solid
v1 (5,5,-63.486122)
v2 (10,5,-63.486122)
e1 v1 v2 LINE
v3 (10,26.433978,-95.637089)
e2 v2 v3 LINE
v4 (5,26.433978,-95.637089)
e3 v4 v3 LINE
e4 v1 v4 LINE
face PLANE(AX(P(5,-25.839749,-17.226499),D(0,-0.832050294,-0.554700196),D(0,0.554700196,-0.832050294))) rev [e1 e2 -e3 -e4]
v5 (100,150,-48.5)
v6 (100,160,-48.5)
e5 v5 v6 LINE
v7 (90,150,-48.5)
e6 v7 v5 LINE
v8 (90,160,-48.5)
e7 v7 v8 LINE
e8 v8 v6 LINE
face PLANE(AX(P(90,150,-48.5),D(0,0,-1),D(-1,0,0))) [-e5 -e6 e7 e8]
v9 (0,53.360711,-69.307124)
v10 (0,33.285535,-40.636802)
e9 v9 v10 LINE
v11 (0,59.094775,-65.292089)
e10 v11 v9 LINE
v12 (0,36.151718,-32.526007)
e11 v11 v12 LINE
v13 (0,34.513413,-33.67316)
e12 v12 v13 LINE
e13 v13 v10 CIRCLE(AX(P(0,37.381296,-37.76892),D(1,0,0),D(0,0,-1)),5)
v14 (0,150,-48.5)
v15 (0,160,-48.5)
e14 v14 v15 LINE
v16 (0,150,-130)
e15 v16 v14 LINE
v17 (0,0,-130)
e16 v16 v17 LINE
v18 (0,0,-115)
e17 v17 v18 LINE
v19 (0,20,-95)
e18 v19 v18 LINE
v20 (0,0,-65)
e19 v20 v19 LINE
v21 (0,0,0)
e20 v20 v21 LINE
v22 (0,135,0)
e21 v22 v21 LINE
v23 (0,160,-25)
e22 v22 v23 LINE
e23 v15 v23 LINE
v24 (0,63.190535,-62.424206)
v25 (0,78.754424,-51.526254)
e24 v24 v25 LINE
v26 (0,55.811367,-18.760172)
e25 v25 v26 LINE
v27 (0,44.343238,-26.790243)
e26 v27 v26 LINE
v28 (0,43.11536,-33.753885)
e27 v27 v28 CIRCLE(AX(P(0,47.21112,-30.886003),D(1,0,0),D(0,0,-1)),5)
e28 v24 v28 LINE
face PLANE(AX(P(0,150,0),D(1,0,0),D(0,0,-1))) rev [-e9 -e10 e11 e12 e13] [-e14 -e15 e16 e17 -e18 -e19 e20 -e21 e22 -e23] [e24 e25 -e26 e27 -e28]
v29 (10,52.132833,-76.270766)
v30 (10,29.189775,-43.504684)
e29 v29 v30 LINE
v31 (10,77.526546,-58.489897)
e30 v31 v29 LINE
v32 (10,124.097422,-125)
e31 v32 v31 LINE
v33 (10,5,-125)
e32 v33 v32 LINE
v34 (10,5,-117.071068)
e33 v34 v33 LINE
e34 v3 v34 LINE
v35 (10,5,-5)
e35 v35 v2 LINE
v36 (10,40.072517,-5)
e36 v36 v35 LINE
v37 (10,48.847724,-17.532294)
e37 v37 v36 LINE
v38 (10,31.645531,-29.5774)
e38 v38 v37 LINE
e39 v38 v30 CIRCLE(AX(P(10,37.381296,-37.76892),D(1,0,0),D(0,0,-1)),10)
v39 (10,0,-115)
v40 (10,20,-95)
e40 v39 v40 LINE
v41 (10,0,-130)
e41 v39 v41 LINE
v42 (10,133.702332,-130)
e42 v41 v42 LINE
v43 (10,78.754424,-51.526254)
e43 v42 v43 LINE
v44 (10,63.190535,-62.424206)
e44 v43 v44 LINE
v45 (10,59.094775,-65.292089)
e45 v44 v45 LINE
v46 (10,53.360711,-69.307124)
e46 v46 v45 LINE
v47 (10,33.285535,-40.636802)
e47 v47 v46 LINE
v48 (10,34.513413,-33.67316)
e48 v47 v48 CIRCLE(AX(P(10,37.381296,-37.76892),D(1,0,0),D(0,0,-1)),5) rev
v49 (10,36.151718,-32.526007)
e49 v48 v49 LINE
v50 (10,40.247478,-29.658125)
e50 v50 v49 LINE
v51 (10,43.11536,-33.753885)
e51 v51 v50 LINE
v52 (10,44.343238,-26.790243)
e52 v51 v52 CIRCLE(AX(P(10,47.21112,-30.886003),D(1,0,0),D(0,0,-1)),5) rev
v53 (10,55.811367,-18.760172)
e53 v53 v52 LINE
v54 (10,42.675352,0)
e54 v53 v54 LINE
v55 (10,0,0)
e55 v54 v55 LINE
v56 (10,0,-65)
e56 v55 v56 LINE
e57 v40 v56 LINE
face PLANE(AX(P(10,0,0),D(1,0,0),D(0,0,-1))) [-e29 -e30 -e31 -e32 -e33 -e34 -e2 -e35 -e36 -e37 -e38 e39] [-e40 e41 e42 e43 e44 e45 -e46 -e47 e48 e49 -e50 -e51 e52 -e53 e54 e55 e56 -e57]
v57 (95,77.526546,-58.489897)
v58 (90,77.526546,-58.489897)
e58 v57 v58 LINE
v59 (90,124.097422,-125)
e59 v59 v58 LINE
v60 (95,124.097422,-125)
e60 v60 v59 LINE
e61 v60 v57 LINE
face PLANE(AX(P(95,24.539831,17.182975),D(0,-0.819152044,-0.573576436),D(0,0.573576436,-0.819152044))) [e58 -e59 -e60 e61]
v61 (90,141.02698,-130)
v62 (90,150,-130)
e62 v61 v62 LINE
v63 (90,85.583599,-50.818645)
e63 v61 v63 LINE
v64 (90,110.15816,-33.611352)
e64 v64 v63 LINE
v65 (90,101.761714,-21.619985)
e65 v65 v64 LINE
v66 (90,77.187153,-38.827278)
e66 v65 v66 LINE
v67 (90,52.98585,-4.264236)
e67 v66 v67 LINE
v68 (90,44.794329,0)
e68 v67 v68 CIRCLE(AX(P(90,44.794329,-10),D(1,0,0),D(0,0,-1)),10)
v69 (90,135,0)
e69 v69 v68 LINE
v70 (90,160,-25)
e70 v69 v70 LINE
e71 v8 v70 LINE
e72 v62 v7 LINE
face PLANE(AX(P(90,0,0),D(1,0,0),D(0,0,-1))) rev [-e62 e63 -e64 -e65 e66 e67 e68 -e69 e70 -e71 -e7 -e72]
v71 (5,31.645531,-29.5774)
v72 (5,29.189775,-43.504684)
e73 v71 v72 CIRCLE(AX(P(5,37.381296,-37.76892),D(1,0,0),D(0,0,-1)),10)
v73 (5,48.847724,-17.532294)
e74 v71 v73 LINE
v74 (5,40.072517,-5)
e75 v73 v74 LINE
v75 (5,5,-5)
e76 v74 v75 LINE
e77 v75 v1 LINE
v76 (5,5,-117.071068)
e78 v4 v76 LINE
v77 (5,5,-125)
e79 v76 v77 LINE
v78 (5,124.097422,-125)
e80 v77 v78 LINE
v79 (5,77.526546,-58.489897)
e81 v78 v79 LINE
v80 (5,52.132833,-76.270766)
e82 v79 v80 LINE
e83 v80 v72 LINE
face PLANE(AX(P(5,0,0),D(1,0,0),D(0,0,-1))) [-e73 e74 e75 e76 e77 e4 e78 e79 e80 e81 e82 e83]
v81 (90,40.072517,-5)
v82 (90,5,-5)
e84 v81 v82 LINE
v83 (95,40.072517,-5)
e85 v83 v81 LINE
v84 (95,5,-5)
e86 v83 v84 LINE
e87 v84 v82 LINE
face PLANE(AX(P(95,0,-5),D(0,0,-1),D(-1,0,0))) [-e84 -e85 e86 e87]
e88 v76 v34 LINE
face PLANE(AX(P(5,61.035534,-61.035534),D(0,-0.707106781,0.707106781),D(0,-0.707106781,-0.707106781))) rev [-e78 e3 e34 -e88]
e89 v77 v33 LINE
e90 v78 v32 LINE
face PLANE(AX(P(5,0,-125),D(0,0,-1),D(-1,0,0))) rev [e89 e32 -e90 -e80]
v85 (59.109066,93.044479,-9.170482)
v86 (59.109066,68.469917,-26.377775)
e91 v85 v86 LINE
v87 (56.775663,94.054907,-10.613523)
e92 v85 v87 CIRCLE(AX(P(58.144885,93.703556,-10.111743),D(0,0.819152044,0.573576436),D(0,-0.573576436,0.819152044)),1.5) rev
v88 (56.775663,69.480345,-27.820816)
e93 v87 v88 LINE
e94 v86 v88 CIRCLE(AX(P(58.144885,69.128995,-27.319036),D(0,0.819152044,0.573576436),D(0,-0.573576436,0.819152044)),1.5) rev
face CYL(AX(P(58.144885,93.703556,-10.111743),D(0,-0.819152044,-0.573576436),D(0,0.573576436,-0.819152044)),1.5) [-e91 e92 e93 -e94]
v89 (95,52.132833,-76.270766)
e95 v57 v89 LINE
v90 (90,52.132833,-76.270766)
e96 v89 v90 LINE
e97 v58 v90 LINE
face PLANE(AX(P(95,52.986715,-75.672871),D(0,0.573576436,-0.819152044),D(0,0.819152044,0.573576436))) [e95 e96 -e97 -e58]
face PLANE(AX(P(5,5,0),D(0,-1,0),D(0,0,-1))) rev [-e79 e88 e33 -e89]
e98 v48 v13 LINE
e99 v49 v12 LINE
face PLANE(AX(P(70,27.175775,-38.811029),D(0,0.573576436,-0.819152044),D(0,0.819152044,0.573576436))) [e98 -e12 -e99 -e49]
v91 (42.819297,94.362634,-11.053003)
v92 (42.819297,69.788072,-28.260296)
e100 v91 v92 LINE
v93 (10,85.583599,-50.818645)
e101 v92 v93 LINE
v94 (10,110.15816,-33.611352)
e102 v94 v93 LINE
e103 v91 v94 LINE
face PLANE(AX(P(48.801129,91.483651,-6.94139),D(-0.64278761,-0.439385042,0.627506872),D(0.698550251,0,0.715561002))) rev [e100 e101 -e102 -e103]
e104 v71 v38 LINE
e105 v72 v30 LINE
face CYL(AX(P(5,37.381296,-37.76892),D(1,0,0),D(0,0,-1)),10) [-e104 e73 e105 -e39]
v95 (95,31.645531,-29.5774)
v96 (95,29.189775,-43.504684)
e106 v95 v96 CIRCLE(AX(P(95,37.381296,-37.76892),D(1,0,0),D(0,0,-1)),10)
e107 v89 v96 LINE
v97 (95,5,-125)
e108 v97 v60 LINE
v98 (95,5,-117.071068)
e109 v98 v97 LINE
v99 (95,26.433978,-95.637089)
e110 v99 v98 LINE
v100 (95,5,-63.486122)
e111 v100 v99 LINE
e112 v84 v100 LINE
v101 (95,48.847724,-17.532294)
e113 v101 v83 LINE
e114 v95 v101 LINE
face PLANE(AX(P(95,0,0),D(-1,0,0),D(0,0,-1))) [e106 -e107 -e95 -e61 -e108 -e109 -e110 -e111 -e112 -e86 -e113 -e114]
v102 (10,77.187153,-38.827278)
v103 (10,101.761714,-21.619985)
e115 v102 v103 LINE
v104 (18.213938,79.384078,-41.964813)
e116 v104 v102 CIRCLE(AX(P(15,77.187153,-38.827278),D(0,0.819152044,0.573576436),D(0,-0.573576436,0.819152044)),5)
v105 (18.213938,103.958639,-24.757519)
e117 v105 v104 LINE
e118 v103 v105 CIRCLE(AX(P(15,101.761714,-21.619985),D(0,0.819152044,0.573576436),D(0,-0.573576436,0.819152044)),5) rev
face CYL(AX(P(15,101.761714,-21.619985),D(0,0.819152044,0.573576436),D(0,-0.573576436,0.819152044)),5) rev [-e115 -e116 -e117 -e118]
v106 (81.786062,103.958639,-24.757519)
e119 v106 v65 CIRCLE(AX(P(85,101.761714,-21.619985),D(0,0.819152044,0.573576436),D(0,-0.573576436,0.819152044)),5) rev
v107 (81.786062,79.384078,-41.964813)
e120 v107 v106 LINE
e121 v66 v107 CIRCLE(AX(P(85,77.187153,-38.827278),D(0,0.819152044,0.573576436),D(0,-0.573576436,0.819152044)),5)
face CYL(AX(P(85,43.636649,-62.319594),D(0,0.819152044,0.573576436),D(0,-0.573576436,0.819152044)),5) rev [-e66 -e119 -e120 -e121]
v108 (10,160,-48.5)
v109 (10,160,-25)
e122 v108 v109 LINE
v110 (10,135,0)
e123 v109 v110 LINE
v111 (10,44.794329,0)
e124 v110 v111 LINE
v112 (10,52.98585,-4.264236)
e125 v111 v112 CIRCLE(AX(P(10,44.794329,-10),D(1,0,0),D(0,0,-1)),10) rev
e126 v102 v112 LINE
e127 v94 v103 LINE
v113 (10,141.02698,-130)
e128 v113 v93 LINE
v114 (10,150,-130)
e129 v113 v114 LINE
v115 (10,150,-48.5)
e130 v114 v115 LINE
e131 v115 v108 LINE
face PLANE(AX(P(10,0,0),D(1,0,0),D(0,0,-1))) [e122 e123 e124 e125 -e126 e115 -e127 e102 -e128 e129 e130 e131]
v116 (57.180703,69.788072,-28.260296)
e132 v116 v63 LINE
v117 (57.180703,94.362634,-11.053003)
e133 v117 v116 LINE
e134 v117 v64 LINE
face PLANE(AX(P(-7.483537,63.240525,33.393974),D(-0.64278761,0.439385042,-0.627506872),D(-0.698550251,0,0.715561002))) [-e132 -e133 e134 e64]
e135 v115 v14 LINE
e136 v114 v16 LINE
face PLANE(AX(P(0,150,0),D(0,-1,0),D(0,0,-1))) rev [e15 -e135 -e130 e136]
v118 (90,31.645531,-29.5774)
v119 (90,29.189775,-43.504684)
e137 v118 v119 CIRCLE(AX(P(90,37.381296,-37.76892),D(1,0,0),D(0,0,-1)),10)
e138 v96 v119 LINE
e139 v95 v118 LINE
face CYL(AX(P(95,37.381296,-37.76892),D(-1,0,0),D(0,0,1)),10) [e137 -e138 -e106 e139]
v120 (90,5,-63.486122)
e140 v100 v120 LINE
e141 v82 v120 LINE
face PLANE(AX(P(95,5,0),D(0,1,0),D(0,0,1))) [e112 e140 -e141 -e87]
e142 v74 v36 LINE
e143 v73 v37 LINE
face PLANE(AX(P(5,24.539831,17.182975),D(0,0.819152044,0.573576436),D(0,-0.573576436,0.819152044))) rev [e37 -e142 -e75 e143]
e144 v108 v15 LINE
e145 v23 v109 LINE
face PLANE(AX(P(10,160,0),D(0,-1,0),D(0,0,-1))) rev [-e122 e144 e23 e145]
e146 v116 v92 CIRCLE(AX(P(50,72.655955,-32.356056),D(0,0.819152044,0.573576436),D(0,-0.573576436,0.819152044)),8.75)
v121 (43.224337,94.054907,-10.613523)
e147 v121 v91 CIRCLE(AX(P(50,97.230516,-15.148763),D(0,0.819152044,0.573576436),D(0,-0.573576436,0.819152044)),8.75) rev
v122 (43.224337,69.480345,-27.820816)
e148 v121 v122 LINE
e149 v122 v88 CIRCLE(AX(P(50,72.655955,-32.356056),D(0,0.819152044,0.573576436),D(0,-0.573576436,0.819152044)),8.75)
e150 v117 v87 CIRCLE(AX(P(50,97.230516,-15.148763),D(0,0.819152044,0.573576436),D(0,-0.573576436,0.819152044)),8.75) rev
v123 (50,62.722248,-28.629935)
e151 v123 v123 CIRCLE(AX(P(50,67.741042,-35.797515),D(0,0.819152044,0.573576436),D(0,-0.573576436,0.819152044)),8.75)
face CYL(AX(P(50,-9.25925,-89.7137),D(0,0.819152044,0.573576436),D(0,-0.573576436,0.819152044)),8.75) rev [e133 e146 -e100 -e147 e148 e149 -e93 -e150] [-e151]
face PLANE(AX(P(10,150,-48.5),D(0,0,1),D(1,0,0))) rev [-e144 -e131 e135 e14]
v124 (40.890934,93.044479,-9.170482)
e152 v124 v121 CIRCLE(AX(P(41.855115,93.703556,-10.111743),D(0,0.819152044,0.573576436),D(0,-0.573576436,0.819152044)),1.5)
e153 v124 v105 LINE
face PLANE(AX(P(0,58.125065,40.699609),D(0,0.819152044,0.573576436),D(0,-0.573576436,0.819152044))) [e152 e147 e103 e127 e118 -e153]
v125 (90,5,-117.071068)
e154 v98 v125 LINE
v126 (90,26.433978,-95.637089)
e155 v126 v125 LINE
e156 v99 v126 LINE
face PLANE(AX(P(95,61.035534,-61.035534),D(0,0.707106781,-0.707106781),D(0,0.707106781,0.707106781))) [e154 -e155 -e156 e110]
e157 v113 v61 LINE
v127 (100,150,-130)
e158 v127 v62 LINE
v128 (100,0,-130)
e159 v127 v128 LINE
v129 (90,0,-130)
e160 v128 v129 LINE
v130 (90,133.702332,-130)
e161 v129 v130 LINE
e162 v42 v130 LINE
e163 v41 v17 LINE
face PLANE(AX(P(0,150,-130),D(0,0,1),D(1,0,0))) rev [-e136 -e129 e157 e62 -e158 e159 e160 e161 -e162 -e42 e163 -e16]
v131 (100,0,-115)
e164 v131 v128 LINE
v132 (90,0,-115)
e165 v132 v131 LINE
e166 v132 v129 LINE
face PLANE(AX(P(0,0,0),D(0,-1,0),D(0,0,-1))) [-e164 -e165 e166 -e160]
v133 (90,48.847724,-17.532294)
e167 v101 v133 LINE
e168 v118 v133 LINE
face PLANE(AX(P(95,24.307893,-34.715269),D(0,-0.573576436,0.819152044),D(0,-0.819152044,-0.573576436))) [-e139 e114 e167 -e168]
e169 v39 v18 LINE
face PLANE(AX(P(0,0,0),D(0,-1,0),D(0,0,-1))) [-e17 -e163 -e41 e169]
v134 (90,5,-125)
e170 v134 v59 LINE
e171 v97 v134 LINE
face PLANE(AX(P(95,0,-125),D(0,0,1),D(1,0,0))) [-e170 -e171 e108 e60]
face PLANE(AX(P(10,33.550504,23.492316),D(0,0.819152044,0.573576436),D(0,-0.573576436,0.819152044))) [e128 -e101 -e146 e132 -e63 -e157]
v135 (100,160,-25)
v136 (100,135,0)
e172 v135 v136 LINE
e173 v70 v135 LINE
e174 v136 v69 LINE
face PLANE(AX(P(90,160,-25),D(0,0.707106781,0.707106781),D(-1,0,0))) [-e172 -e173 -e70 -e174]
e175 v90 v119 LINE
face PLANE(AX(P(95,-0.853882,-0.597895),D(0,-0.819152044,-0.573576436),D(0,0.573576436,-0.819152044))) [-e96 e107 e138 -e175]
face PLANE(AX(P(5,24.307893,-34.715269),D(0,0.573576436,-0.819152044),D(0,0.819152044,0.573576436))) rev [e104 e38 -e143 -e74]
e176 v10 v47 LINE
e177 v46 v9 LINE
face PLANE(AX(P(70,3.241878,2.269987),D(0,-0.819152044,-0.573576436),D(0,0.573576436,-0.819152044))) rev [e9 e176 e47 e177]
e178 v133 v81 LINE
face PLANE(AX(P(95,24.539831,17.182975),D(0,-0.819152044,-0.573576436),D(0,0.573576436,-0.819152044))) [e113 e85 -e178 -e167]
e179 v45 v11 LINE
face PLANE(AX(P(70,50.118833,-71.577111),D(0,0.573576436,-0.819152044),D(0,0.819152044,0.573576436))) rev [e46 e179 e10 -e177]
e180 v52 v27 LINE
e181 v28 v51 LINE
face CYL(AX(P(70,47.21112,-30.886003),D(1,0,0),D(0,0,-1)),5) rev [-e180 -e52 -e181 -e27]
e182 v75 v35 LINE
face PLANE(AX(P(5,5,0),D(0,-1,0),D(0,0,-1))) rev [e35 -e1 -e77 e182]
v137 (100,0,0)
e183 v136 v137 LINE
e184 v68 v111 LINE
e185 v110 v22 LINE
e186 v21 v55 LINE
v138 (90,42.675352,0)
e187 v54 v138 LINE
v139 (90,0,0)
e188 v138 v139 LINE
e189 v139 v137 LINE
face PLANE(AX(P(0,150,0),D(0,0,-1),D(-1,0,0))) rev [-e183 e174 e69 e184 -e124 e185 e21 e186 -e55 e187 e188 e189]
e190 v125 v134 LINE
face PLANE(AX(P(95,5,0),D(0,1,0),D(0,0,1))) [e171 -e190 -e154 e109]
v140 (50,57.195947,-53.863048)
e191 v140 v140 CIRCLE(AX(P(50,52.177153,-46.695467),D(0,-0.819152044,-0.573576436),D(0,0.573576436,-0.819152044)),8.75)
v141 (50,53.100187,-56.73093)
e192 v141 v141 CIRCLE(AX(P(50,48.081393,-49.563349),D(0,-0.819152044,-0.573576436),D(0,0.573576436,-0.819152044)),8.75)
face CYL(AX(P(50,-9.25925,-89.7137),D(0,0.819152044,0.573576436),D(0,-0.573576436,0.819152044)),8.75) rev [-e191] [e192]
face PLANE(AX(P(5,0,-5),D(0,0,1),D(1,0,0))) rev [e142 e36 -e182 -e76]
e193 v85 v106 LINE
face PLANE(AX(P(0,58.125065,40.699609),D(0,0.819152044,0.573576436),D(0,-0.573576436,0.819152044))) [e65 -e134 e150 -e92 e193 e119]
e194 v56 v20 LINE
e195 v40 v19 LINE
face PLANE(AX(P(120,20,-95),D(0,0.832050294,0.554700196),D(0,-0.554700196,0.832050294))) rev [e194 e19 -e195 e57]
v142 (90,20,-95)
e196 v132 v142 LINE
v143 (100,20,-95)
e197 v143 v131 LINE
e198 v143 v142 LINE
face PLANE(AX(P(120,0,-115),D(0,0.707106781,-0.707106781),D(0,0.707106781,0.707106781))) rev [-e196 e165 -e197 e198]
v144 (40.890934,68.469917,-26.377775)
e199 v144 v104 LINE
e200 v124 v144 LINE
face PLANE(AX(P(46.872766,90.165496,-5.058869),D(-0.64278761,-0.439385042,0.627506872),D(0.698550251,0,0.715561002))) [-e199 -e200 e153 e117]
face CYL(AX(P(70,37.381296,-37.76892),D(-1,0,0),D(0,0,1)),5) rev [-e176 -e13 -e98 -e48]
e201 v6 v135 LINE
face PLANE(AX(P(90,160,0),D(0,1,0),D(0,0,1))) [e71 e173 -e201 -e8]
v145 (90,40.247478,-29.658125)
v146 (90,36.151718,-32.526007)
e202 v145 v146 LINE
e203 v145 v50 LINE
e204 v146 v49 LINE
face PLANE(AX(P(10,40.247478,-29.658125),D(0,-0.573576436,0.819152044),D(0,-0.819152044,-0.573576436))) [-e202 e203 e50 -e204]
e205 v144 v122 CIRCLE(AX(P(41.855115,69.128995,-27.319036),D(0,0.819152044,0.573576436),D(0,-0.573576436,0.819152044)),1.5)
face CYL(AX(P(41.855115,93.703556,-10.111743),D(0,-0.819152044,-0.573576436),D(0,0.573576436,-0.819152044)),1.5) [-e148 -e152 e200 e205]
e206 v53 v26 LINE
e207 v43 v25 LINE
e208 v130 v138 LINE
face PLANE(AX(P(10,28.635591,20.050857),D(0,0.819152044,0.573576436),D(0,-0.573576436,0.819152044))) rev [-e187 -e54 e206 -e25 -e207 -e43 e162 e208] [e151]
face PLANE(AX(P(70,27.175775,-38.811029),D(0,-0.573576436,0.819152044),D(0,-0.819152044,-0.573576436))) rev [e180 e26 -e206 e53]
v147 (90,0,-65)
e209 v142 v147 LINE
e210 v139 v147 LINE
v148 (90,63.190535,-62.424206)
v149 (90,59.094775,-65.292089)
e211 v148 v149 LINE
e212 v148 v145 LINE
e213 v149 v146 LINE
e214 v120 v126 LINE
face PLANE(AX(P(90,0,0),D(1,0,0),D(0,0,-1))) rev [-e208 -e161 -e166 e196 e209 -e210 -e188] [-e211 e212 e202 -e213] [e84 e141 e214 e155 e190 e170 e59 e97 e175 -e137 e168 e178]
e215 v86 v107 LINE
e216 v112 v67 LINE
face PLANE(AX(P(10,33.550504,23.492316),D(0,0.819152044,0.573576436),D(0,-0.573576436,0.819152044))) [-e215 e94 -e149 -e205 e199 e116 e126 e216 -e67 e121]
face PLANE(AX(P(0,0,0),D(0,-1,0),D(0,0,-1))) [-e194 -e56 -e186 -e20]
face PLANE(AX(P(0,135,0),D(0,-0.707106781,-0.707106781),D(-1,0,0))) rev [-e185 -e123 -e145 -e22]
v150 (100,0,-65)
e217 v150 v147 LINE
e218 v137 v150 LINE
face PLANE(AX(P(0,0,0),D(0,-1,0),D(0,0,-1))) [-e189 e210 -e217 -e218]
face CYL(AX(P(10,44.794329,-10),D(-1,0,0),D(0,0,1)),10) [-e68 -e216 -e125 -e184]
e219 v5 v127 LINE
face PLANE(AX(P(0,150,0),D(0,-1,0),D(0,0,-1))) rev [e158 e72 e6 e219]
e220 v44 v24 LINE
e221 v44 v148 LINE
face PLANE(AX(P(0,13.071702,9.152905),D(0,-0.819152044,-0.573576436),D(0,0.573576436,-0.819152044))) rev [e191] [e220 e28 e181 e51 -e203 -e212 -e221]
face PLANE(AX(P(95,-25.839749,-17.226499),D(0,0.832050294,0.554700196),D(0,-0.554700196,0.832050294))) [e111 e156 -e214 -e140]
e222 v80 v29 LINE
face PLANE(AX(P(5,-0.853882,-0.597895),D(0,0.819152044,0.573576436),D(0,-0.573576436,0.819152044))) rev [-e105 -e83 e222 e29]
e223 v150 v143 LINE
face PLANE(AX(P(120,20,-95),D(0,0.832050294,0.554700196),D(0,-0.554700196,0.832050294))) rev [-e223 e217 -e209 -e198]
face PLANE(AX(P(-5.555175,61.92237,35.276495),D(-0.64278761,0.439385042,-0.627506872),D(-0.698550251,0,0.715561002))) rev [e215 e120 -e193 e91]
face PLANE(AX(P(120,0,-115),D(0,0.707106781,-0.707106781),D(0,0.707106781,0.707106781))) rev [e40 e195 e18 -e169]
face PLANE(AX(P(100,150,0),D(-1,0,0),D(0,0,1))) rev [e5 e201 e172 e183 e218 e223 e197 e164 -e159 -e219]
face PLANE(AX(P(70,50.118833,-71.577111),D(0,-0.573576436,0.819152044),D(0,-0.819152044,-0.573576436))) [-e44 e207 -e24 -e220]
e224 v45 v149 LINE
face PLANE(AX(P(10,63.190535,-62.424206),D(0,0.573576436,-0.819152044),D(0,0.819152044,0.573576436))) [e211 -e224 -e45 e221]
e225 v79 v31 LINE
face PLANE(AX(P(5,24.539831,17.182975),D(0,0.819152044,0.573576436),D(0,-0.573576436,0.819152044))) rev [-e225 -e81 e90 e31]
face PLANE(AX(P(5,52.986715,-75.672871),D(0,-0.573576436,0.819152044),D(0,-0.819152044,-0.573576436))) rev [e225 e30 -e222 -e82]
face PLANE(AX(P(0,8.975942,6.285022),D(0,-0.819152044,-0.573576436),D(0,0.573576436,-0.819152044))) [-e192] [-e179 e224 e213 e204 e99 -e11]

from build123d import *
from build123d.topology import SkipClean

# Parameters (mm, degrees)
SKETCH5_W           = 100
SKETCH5_H           = 130
BOSS_EXTRUDE1_DEPTH = 150
CUT_EXTRUDE1_START  = -50
CUT_EXTRUDE1_DEPTH  = 40
BOSS_EXTRUDE3_START = 30
SKETCH17_W          = 80
SKETCH17_H          = 40
BOSS_EXTRUDE3_DEPTH = 5
SKETCH10_R          = 8.75
CUT_EXTRUDE3_DEPTH  = 100
SKETCH18_W          = 48.5
SKETCH18_H          = 10
BOSS_EXTRUDE4_DEPTH = 10
BOSS_EXTRUDE5_START = 100
SKETCH18_2_W        = 48.5
SKETCH18_2_H        = 10
BOSS_EXTRUDE5_DEPTH = 10
CUT_EXTRUDE5_DEPTH  = 70
FILLET1_DEPTH       = 10
CUT_EXTRUDE6_DEPTH  = 120
FILLET2_R           = 10
CHAMFER2_SIZE       = 25
BOSS_EXTRUDE6_START = 30
BOSS_EXTRUDE6_DEPTH = 30
FILLET3_R           = 5
CUT_EXTRUDE7_DEPTH  = 5


with BuildPart() as part:
    # Sketch5 → Boss-Extrude1 (new body)
    with BuildSketch(Plane(origin=(0, 0, 0), x_dir=(1, 0, 0), z_dir=(0, 1, 0))):
        with Locations((50, 65)):
            Rectangle(SKETCH5_W, SKETCH5_H)
    extrude(amount=BOSS_EXTRUDE1_DEPTH)

    # Sketch7 → Cut-Extrude1 (cut, symmetric)
    with BuildSketch(Plane(origin=(100, 0, 0), x_dir=(0, 0, -1), z_dir=(1, 0, 0)).offset(CUT_EXTRUDE1_START)):
        Polygon((130, 0), (130, 133.702332435), (0, 42.675352467), (0, 0), align=None)
        Polygon((0, 50), (130, 141.026979967), (130, 150), (0, 150), align=None)
    extrude(amount=CUT_EXTRUDE1_DEPTH, both=True, mode=Mode.SUBTRACT)

    # Sketch17 → Boss-Extrude3 (add)
    with BuildSketch(Plane(origin=(0, 275.412054826, -321.921776796), x_dir=(1, 0, 0), z_dir=(0, -0.819152044288993, -0.5735764363510444)).offset(BOSS_EXTRUDE3_START)):
        with Locations((50, 354.293228142)):
            Rectangle(SKETCH17_W, SKETCH17_H)
    extrude(amount=-BOSS_EXTRUDE3_DEPTH)

    # Sketch10 → Cut-Extrude3 (cut)
    with BuildSketch(Plane(origin=(0, 33.550503583, 23.49231552), x_dir=(1, 0, 0), z_dir=(0, 0.819152044288993, 0.5735764363510444))):
        with Locations(Location((50, 68.178273127, 0), (0, 0, 90))):
            Circle(SKETCH10_R)
    extrude(amount=-CUT_EXTRUDE3_DEPTH, mode=Mode.SUBTRACT)

    # Sketch18 → Boss-Extrude4 (add)
    with BuildSketch(Plane(origin=(0, 0, 0), x_dir=(0, 0, -1), z_dir=(1, 0, 0))):
        with Locations((24.25, 155)):
            Rectangle(SKETCH18_W, SKETCH18_H)
    extrude(amount=BOSS_EXTRUDE4_DEPTH)

    # Sketch18<2> → Boss-Extrude5 (add)
    with BuildSketch(Plane(origin=(0, 0, 0), x_dir=(0, 0, -1), z_dir=(1, 0, 0)).offset(BOSS_EXTRUDE5_START)):
        with Locations((24.25, 155)):
            Rectangle(SKETCH18_2_W, SKETCH18_2_H)
    extrude(amount=-BOSS_EXTRUDE5_DEPTH)

    # Sketch21 → Cut-Extrude5 (cut)
    with BuildSketch(Plane(origin=(0, 0, 0), x_dir=(0, 0, -1), z_dir=(1, 0, 0))):
        Polygon((62.42420648, 63.190535225), (51.526254189, 78.754424066), (18.760172418, 55.811366612), (29.658124708, 40.247477771), align=None)
        Polygon((69.307123716, 53.360710693), (36.541041945, 30.417653239), (32.52600689, 36.151717549), (65.292088662, 59.094775003), align=None)
    extrude(amount=CUT_EXTRUDE5_DEPTH, mode=Mode.SUBTRACT)

    # Fillet1: read off the stored shape, not the designer's step
    # Fillet1 outline → Fillet1 (add)
    with BuildSketch(Plane.YZ):
        with BuildLine():
            Line((30.417653239, -36.541041945), (33.285535421, -40.636802166))
            ThreePointArc((33.285535421, -40.636802166), (32.457256878, -36.900679096), (34.513413461, -33.673159763))
            Line((34.513413461, -33.673159763), (30.417653239, -36.541041945))
        make_face()
        with BuildLine():
            ThreePointArc((43.115359953, -33.75388493), (42.287081409, -30.01776186), (44.343237992, -26.790242527))
            Line((44.343237992, -26.790242527), (40.247477771, -29.658124708))
            Line((40.247477771, -29.658124708), (43.115359953, -33.75388493))
        make_face()
    extrude(amount=FILLET1_DEPTH)

    # Sketch22 → Cut-Extrude6 (cut)
    with BuildSketch(Plane.ZY):
        Polygon((-115, 0), (-95, 20), (-65, 0), align=None)
    extrude(amount=-CUT_EXTRUDE6_DEPTH, mode=Mode.SUBTRACT)

    # Fillet2
    fillet2_edges = [part.edges().sort_by_distance(p)[0] for p in [
        (50, 50, 0),
    ]]
    fillet(fillet2_edges, radius=FILLET2_R)

    # Chamfer2
    chamfer2_edges = [part.edges().sort_by_distance(p)[0] for p in [
        (5, 160, 0),
        (95, 160, 0),
    ]]
    chamfer(chamfer2_edges, length=CHAMFER2_SIZE)

    # Sketch23 → Boss-Extrude6 (add)
    with SkipClean():  # the faces are left unmerged after this step: merging them gives an invalid solid
        with BuildSketch(Plane(origin=(0, 33.550503583, 23.49231552), x_dir=(1, 0, 0), z_dir=(0, 0.819152044288993, 0.5735764363510444)).offset(BOSS_EXTRUDE6_START)):
            with BuildLine():
                Line((90, 90.716932877), (57.180703308, 63.178273127))
                ThreePointArc((57.180703308, 63.178273127), (56.983337112, 62.906129088), (56.77566264, 62.64176739))
                ThreePointArc((56.77566264, 62.64176739), (57.241088602, 60.832062958), (59.109066137, 60.880139798))
                Line((59.109066137, 60.880139798), (90, 86.800711009))
                Line((90, 86.800711009), (90, 90.716932877))
            make_face()
            with BuildLine():
                ThreePointArc((40.890933863, 60.880139798), (42.758911398, 60.832062958), (43.22433736, 62.64176739))
                ThreePointArc((43.22433736, 62.64176739), (43.016662888, 62.906129088), (42.819296692, 63.178273127))
                Line((42.819296692, 63.178273127), (10, 90.716932877))
                Line((10, 90.716932877), (10, 86.800711009))
                Line((10, 86.800711009), (40.890933863, 60.880139798))
            make_face()
        extrude(amount=-BOSS_EXTRUDE6_DEPTH)

    # Fillet3
    fillet3_edges = [part.edges().sort_by_distance(p)[0] for p in [
        (90, 95.624626741, -39.007017804),
        (10, 95.624626741, -39.007017804),
    ]]
    fillet(fillet3_edges, radius=FILLET3_R)

    # Sketch24 → Cut-Extrude7 (cut)
    with SkipClean():  # the faces are left unmerged after this step: merging them gives an invalid solid
        with BuildSketch(Plane(origin=(10, 0, 0), x_dir=(0, 0, -1), z_dir=(1, 0, 0))):
            with BuildLine():
                ThreePointArc((29.577399541, 31.645531279), (36.032438208, 27.533218113), (43.504684348, 29.1897752))
                Line((43.504684348, 29.1897752), (76.270766119, 52.132832654))
                Line((76.270766119, 52.132832654), (69.387848883, 61.962657185))
                Line((69.387848883, 61.962657185), (66.519966701, 66.058417407))
                Line((66.519966701, 66.058417407), (58.489896592, 77.526546027))
                Line((58.489896592, 77.526546027), (125, 124.0974218))
                Line((125, 124.0974218), (125, 5))
                Line((125, 5), (117.071067812, 5))
                Line((117.071067812, 5), (95.637089412, 26.4339784))
                Line((95.637089412, 26.4339784), (63.486121811, 5))
                Line((63.486121811, 5), (5, 5))
                Line((5, 5), (5, 40.072517215))
                Line((5, 40.072517215), (17.532294378, 48.847724209))
                Line((17.532294378, 48.847724209), (22.694482305, 41.475355811))
                Line((22.694482305, 41.475355811), (25.562364487, 37.379595589))
                Line((25.562364487, 37.379595589), (28.430246669, 33.283835368))
                Line((28.430246669, 33.283835368), (29.577399541, 31.645531279))
            make_face()
        cut_extrude7 = extrude(amount=-CUT_EXTRUDE7_DEPTH, mode=Mode.SUBTRACT)

    # Mirror1: Cut-Extrude7 across plane
    with SkipClean():  # the faces are left unmerged after this step: merging them gives an invalid solid
        add(cut_extrude7.mirror(Plane.ZY.offset(-50)), mode=Mode.SUBTRACT)


solid = part.part
